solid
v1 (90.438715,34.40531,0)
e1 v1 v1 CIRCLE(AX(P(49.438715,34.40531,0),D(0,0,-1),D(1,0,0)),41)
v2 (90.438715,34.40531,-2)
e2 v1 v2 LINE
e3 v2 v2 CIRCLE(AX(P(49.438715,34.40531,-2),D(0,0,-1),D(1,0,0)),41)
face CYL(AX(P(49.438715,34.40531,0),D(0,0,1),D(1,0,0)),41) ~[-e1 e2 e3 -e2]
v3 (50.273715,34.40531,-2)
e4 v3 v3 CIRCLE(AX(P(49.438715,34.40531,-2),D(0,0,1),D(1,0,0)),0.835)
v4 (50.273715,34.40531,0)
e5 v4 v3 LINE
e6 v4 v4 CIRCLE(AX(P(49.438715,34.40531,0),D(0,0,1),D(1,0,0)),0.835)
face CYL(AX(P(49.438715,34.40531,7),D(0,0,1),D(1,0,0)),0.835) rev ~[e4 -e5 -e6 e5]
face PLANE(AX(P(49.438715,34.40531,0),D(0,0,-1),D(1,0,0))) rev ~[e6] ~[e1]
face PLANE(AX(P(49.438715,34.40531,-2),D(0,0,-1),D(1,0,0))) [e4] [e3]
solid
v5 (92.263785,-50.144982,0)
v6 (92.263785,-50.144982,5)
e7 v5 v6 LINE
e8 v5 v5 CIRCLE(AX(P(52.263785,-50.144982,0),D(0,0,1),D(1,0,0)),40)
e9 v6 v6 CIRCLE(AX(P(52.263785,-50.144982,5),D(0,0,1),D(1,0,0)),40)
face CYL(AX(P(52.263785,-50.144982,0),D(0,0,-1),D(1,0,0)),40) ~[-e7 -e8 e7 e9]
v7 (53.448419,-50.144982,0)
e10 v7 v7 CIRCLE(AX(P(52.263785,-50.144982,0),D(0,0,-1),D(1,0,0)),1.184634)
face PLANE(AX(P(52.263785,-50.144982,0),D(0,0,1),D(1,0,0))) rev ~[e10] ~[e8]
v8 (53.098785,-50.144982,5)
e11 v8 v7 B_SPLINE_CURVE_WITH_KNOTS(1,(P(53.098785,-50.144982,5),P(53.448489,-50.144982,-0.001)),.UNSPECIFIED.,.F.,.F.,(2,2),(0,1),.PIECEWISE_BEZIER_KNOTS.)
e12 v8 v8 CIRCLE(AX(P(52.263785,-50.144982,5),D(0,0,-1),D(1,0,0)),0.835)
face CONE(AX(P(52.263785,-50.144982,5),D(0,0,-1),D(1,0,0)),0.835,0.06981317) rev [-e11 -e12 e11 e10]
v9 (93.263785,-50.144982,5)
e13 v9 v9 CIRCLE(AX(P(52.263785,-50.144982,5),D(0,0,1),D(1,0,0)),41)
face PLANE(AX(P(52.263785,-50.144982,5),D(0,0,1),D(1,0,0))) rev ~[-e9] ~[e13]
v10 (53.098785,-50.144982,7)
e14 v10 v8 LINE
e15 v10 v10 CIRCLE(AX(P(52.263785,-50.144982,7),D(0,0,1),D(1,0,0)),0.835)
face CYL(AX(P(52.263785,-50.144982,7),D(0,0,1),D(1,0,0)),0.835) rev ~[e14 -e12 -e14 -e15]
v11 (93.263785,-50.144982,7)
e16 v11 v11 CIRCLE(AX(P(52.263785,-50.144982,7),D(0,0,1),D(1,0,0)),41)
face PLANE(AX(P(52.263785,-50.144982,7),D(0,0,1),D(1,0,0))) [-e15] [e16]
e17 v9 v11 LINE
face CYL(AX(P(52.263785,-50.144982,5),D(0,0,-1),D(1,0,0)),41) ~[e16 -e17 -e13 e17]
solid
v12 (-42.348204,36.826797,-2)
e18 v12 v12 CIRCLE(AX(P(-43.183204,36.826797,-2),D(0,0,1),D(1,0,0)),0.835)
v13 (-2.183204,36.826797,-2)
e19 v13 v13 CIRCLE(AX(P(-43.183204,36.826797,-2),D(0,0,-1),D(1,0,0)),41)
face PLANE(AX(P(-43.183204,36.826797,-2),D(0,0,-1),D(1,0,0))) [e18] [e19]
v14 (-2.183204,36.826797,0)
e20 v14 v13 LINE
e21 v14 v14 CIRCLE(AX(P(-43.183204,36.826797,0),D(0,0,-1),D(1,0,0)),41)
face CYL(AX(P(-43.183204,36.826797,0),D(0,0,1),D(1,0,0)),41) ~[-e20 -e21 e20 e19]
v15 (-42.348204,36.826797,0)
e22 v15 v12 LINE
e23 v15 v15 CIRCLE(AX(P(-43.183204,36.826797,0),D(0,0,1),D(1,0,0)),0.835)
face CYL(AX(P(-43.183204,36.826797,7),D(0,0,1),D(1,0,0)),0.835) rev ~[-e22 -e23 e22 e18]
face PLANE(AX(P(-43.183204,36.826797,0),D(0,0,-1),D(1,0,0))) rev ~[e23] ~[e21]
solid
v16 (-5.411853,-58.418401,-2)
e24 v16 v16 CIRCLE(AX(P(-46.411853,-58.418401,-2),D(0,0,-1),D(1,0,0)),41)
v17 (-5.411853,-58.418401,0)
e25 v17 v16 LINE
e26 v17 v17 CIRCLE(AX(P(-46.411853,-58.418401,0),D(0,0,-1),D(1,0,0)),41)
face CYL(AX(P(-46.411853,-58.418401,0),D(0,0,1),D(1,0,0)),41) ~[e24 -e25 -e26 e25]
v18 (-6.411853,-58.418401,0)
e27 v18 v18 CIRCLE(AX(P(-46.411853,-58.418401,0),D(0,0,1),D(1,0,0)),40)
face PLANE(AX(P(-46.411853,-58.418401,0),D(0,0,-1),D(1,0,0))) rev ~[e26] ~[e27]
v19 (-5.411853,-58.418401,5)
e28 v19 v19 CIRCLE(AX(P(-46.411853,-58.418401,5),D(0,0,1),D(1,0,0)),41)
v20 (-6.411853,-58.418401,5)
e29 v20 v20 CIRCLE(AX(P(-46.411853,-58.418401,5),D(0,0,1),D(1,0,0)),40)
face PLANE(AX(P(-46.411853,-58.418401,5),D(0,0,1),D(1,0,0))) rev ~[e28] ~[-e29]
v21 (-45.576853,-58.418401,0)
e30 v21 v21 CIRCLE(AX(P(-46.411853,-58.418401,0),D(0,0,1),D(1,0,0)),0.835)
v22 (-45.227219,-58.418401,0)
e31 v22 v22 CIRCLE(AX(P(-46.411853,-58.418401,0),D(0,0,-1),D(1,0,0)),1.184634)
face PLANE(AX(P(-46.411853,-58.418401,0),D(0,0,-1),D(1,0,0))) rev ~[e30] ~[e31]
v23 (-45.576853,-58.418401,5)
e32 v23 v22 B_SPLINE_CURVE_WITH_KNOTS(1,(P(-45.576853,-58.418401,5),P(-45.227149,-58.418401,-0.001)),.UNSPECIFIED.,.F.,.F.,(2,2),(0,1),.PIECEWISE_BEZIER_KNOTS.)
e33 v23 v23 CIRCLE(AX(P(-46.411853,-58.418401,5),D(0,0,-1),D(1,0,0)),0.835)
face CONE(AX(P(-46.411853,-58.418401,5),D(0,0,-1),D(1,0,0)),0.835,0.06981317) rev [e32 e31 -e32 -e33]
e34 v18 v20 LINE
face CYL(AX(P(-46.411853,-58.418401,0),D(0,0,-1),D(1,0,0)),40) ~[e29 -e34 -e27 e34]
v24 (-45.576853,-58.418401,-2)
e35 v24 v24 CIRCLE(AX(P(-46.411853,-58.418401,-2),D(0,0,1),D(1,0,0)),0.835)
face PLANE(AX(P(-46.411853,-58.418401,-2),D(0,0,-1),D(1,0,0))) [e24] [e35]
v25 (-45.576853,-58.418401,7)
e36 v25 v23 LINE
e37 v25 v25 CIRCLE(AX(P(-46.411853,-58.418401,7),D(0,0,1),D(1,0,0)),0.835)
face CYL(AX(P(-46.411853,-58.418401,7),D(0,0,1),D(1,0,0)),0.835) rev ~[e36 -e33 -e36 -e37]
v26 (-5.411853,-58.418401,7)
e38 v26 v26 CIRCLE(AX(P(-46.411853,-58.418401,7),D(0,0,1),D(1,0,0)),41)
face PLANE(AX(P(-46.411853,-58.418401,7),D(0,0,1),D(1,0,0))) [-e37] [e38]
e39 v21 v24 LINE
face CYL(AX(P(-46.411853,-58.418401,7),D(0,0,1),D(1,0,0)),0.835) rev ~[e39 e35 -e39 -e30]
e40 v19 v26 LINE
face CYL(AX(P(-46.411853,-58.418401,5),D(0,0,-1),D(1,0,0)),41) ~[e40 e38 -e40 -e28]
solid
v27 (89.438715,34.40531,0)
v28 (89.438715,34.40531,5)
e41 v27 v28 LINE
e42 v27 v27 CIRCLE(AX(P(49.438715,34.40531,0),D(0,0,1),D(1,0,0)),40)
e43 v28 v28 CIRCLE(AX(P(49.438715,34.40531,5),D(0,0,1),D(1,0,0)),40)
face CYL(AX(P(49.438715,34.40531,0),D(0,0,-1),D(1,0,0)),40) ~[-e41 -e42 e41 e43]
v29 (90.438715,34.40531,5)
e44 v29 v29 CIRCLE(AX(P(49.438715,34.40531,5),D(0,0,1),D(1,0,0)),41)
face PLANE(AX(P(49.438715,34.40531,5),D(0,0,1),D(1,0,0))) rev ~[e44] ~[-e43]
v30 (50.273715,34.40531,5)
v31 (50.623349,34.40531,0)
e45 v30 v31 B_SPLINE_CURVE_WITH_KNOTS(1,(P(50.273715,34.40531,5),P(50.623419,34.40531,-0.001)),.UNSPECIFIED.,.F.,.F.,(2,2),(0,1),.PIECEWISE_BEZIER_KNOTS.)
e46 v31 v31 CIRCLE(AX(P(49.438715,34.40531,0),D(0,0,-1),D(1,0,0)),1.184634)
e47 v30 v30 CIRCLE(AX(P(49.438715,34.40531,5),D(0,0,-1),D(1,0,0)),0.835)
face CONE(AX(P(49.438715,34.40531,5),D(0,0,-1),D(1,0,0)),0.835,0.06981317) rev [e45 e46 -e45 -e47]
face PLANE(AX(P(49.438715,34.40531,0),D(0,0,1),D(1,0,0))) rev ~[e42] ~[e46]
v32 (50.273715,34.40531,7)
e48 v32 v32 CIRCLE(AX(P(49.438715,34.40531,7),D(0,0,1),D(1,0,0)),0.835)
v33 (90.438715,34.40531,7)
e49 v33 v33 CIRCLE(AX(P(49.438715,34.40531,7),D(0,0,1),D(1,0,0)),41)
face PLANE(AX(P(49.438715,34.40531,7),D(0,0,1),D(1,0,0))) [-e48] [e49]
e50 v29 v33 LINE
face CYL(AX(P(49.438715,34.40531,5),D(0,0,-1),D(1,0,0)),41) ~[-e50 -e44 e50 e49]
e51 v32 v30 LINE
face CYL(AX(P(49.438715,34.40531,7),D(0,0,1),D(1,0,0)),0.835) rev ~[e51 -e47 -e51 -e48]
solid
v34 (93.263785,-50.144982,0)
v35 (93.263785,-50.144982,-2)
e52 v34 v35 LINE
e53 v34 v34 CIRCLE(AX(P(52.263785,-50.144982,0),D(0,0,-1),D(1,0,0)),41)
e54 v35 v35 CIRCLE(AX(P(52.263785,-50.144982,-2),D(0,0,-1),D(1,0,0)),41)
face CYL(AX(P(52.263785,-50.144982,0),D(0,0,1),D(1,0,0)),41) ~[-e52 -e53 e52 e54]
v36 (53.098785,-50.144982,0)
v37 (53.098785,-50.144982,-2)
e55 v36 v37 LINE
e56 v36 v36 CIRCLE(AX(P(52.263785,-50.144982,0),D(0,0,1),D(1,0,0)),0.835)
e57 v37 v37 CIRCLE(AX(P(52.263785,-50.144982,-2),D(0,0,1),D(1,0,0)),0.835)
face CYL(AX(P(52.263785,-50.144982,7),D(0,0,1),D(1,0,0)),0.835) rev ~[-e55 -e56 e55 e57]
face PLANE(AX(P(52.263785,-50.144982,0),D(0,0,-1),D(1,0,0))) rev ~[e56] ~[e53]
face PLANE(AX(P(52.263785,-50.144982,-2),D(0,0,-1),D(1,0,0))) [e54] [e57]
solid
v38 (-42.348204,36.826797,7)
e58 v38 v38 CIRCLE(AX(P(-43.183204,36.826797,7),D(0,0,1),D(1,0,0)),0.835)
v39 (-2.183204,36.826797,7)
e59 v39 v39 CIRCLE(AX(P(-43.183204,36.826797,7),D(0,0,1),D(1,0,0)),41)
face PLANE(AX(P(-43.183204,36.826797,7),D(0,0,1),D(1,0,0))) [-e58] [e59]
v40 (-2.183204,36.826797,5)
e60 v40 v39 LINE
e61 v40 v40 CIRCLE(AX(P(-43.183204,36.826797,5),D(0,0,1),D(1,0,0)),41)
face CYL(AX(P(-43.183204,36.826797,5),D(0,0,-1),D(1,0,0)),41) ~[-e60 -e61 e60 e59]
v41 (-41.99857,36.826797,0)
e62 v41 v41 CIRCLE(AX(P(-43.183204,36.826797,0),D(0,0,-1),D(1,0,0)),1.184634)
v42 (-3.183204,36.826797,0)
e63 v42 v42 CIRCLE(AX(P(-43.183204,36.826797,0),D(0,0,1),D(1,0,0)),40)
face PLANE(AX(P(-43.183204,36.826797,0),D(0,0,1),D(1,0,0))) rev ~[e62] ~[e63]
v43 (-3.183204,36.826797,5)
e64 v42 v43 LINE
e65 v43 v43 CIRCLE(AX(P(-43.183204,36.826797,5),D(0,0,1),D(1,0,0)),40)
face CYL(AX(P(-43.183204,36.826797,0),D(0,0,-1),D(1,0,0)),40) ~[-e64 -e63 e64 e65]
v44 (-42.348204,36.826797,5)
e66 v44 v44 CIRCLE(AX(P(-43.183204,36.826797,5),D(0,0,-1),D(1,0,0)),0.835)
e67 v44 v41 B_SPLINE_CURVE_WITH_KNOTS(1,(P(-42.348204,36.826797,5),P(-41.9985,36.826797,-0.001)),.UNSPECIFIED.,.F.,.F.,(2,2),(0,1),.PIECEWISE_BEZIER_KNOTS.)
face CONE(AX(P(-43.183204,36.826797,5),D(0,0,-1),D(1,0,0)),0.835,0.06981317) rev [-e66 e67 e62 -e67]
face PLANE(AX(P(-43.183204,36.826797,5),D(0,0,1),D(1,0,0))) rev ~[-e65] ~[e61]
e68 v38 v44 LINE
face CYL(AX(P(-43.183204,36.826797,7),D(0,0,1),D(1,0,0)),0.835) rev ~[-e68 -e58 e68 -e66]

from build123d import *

# Parameters (mm, degrees)
F0_R      = 40
F1_DEPTH  = 5
F2_R      = 0.835
F3_DEPTH  = 5.001
F3_TAPER  = -4
F4_R      = 0.835
F5_DEPTH  = 5.0010001
F5_TAPER  = -4
F6_R      = 0.835
F7_DEPTH  = 5.0010001
F7_TAPER  = -4
F8_R      = 0.835
F9_DEPTH  = 5.0010001
F9_TAPER  = -4
F13_R     = 41
F14_DEPTH = 2
F12_R     = 41
F11_R     = 41
F10_R     = 41
F15_R     = 41
F19_DEPTH = 2
F16_R     = 41
F17_R     = 41
F18_R     = 41
F20_R     = 0.835
F21_R     = 0.835
F22_R     = 0.835
F23_R     = 0.835
F24_DEPTH = 9.001


with BuildPart() as f1:
    # F0 (on Top) → F1 (new body)
    with BuildSketch(Plane.XY):
        with Locations((-43.1832037866, 36.8267968297)):
            Circle(F0_R)
    extrude(amount=F1_DEPTH)

    # F2 (on face) → F3 (cut, through all)
    with BuildSketch(Plane.XY.offset(5)):
        with Locations((-43.1832037866, 36.8267968297)):
            Circle(F2_R)
    extrude(amount=-F3_DEPTH, taper=F3_TAPER, mode=Mode.SUBTRACT)

    # F10 (on face) → F14, piece 4 (join)
    with BuildSketch(Plane.XY.offset(5)):
        with Locations((-43.1832037866, 36.8267968297)):
            Circle(F10_R)
    extrude(amount=F14_DEPTH)


with BuildPart() as f1b:
    # F0 (on Top) → F1, piece 2 (new body)
    with BuildSketch(Plane.XY):
        with Locations((49.4387149811, 34.4053097069)):
            Circle(F0_R)
    extrude(amount=F1_DEPTH)

    # F4 (on face) → F5 (cut, through all)
    with BuildSketch(Plane.XY.offset(5)):
        with Locations((49.4387149811, 34.4053097069)):
            Circle(F4_R)
    extrude(amount=-F5_DEPTH, taper=F5_TAPER, mode=Mode.SUBTRACT)

    # F11 (on face) → F14, piece 3 (join)
    with BuildSketch(Plane.XY.offset(5)):
        with Locations((49.4387149811, 34.4053097069)):
            Circle(F11_R)
    extrude(amount=F14_DEPTH)


with BuildPart() as f1c:
    # F0 (on Top) → F1, piece 3 (new body)
    with BuildSketch(Plane.XY):
        with Locations((-46.4118532836, -58.4184005857)):
            Circle(F0_R)
    extrude(amount=F1_DEPTH)

    # F6 (on face) → F7 (cut, through all)
    with BuildSketch(Plane.XY.offset(5)):
        with Locations((-46.4118532836, -58.4184005857)):
            Circle(F6_R)
    extrude(amount=-F7_DEPTH, taper=F7_TAPER, mode=Mode.SUBTRACT)

    # F12 (on face) → F14, piece 2 (join)
    with BuildSketch(Plane.XY.offset(5)):
        with Locations((-46.4118532836, -58.4184005857)):
            Circle(F12_R)
    extrude(amount=F14_DEPTH)

    # F15 (on face) → F19 (join)
    with BuildSketch(Plane(origin=(0, 0, 0), x_dir=(1, 0, 0), z_dir=(0, 0, -1))):
        with Locations((-46.4118532836, 58.4184005857)):
            Circle(F15_R)
    extrude(amount=F19_DEPTH)


with BuildPart() as f1d:
    # F0 (on Top) → F1, piece 4 (new body)
    with BuildSketch(Plane.XY):
        with Locations((52.2637851536, -50.1449815929)):
            Circle(F0_R)
    extrude(amount=F1_DEPTH)

    # F8 (on face) → F9 (cut, through all)
    with BuildSketch(Plane.XY.offset(5)):
        with Locations((52.2637851536, -50.1449815929)):
            Circle(F8_R)
    extrude(amount=-F9_DEPTH, taper=F9_TAPER, mode=Mode.SUBTRACT)

    # F13 (on face) → F14 (join)
    with BuildSketch(Plane.XY.offset(5)):
        with Locations((52.2637851536, -50.1449815929)):
            Circle(F13_R)
    extrude(amount=F14_DEPTH)


with BuildPart() as f19:
    # F16 (on face) → F19, piece 2 (new body)
    with BuildSketch(Plane(origin=(0, 0, 0), x_dir=(1, 0, 0), z_dir=(0, 0, -1))):
        with Locations((52.2637851536, 50.1449815929)):
            Circle(F16_R)
    extrude(amount=F19_DEPTH)


with BuildPart() as f19b:
    # F17 (on face) → F19, piece 3 (new body)
    with BuildSketch(Plane(origin=(0, 0, 0), x_dir=(1, 0, 0), z_dir=(0, 0, -1))):
        with Locations((-43.1832037866, -36.8267968297)):
            Circle(F17_R)
    extrude(amount=F19_DEPTH)


with BuildPart() as f19c:
    # F18 (on face) → F19, piece 4 (new body)
    with BuildSketch(Plane(origin=(0, 0, 0), x_dir=(1, 0, 0), z_dir=(0, 0, -1))):
        with Locations((49.4387149811, -34.4053097069)):
            Circle(F18_R)
    extrude(amount=F19_DEPTH)


with BuildPart() as f24_tool:
    # F20 (on face) + F21 (on face) + F22 (on face) + F23 (on face) → F24 (new body, through all)
    with BuildSketch(Plane.XY.offset(7)):
        with Locations((-43.1832037866, 36.8267968297)):
            Circle(F20_R)
    with BuildSketch(Plane.XY.offset(7)):
        with Locations((-46.4118532836, -58.4184005857)):
            Circle(F21_R)
    with BuildSketch(Plane.XY.offset(7)):
        with Locations((52.2637851536, -50.1449815929)):
            Circle(F22_R)
    with BuildSketch(Plane.XY.offset(7)):
        with Locations((49.4387149811, 34.4053097069)):
            Circle(F23_R)
    extrude(amount=-F24_DEPTH)


with BuildPart() as f1_1:
    add(f1.part)

    # F24: cut by f24_tool
    add(f24_tool.part, mode=Mode.SUBTRACT)


with BuildPart() as f1b_1:
    add(f1b.part)

    # F24: cut by f24_tool
    add(f24_tool.part, mode=Mode.SUBTRACT)


with BuildPart() as f1c_1:
    add(f1c.part)

    # F24: cut by f24_tool
    add(f24_tool.part, mode=Mode.SUBTRACT)


with BuildPart() as f1d_1:
    add(f1d.part)

    # F24: cut by f24_tool
    add(f24_tool.part, mode=Mode.SUBTRACT)


with BuildPart() as f19_1:
    add(f19.part)

    # F24: cut by f24_tool
    add(f24_tool.part, mode=Mode.SUBTRACT)


with BuildPart() as f19b_1:
    add(f19b.part)

    # F24: cut by f24_tool
    add(f24_tool.part, mode=Mode.SUBTRACT)


with BuildPart() as f19c_1:
    add(f19c.part)

    # F24: cut by f24_tool
    add(f24_tool.part, mode=Mode.SUBTRACT)


solid = Compound([f1_1.part, f1b_1.part, f1c_1.part, f1d_1.part, f19_1.part, f19b_1.part, f19c_1.part])
